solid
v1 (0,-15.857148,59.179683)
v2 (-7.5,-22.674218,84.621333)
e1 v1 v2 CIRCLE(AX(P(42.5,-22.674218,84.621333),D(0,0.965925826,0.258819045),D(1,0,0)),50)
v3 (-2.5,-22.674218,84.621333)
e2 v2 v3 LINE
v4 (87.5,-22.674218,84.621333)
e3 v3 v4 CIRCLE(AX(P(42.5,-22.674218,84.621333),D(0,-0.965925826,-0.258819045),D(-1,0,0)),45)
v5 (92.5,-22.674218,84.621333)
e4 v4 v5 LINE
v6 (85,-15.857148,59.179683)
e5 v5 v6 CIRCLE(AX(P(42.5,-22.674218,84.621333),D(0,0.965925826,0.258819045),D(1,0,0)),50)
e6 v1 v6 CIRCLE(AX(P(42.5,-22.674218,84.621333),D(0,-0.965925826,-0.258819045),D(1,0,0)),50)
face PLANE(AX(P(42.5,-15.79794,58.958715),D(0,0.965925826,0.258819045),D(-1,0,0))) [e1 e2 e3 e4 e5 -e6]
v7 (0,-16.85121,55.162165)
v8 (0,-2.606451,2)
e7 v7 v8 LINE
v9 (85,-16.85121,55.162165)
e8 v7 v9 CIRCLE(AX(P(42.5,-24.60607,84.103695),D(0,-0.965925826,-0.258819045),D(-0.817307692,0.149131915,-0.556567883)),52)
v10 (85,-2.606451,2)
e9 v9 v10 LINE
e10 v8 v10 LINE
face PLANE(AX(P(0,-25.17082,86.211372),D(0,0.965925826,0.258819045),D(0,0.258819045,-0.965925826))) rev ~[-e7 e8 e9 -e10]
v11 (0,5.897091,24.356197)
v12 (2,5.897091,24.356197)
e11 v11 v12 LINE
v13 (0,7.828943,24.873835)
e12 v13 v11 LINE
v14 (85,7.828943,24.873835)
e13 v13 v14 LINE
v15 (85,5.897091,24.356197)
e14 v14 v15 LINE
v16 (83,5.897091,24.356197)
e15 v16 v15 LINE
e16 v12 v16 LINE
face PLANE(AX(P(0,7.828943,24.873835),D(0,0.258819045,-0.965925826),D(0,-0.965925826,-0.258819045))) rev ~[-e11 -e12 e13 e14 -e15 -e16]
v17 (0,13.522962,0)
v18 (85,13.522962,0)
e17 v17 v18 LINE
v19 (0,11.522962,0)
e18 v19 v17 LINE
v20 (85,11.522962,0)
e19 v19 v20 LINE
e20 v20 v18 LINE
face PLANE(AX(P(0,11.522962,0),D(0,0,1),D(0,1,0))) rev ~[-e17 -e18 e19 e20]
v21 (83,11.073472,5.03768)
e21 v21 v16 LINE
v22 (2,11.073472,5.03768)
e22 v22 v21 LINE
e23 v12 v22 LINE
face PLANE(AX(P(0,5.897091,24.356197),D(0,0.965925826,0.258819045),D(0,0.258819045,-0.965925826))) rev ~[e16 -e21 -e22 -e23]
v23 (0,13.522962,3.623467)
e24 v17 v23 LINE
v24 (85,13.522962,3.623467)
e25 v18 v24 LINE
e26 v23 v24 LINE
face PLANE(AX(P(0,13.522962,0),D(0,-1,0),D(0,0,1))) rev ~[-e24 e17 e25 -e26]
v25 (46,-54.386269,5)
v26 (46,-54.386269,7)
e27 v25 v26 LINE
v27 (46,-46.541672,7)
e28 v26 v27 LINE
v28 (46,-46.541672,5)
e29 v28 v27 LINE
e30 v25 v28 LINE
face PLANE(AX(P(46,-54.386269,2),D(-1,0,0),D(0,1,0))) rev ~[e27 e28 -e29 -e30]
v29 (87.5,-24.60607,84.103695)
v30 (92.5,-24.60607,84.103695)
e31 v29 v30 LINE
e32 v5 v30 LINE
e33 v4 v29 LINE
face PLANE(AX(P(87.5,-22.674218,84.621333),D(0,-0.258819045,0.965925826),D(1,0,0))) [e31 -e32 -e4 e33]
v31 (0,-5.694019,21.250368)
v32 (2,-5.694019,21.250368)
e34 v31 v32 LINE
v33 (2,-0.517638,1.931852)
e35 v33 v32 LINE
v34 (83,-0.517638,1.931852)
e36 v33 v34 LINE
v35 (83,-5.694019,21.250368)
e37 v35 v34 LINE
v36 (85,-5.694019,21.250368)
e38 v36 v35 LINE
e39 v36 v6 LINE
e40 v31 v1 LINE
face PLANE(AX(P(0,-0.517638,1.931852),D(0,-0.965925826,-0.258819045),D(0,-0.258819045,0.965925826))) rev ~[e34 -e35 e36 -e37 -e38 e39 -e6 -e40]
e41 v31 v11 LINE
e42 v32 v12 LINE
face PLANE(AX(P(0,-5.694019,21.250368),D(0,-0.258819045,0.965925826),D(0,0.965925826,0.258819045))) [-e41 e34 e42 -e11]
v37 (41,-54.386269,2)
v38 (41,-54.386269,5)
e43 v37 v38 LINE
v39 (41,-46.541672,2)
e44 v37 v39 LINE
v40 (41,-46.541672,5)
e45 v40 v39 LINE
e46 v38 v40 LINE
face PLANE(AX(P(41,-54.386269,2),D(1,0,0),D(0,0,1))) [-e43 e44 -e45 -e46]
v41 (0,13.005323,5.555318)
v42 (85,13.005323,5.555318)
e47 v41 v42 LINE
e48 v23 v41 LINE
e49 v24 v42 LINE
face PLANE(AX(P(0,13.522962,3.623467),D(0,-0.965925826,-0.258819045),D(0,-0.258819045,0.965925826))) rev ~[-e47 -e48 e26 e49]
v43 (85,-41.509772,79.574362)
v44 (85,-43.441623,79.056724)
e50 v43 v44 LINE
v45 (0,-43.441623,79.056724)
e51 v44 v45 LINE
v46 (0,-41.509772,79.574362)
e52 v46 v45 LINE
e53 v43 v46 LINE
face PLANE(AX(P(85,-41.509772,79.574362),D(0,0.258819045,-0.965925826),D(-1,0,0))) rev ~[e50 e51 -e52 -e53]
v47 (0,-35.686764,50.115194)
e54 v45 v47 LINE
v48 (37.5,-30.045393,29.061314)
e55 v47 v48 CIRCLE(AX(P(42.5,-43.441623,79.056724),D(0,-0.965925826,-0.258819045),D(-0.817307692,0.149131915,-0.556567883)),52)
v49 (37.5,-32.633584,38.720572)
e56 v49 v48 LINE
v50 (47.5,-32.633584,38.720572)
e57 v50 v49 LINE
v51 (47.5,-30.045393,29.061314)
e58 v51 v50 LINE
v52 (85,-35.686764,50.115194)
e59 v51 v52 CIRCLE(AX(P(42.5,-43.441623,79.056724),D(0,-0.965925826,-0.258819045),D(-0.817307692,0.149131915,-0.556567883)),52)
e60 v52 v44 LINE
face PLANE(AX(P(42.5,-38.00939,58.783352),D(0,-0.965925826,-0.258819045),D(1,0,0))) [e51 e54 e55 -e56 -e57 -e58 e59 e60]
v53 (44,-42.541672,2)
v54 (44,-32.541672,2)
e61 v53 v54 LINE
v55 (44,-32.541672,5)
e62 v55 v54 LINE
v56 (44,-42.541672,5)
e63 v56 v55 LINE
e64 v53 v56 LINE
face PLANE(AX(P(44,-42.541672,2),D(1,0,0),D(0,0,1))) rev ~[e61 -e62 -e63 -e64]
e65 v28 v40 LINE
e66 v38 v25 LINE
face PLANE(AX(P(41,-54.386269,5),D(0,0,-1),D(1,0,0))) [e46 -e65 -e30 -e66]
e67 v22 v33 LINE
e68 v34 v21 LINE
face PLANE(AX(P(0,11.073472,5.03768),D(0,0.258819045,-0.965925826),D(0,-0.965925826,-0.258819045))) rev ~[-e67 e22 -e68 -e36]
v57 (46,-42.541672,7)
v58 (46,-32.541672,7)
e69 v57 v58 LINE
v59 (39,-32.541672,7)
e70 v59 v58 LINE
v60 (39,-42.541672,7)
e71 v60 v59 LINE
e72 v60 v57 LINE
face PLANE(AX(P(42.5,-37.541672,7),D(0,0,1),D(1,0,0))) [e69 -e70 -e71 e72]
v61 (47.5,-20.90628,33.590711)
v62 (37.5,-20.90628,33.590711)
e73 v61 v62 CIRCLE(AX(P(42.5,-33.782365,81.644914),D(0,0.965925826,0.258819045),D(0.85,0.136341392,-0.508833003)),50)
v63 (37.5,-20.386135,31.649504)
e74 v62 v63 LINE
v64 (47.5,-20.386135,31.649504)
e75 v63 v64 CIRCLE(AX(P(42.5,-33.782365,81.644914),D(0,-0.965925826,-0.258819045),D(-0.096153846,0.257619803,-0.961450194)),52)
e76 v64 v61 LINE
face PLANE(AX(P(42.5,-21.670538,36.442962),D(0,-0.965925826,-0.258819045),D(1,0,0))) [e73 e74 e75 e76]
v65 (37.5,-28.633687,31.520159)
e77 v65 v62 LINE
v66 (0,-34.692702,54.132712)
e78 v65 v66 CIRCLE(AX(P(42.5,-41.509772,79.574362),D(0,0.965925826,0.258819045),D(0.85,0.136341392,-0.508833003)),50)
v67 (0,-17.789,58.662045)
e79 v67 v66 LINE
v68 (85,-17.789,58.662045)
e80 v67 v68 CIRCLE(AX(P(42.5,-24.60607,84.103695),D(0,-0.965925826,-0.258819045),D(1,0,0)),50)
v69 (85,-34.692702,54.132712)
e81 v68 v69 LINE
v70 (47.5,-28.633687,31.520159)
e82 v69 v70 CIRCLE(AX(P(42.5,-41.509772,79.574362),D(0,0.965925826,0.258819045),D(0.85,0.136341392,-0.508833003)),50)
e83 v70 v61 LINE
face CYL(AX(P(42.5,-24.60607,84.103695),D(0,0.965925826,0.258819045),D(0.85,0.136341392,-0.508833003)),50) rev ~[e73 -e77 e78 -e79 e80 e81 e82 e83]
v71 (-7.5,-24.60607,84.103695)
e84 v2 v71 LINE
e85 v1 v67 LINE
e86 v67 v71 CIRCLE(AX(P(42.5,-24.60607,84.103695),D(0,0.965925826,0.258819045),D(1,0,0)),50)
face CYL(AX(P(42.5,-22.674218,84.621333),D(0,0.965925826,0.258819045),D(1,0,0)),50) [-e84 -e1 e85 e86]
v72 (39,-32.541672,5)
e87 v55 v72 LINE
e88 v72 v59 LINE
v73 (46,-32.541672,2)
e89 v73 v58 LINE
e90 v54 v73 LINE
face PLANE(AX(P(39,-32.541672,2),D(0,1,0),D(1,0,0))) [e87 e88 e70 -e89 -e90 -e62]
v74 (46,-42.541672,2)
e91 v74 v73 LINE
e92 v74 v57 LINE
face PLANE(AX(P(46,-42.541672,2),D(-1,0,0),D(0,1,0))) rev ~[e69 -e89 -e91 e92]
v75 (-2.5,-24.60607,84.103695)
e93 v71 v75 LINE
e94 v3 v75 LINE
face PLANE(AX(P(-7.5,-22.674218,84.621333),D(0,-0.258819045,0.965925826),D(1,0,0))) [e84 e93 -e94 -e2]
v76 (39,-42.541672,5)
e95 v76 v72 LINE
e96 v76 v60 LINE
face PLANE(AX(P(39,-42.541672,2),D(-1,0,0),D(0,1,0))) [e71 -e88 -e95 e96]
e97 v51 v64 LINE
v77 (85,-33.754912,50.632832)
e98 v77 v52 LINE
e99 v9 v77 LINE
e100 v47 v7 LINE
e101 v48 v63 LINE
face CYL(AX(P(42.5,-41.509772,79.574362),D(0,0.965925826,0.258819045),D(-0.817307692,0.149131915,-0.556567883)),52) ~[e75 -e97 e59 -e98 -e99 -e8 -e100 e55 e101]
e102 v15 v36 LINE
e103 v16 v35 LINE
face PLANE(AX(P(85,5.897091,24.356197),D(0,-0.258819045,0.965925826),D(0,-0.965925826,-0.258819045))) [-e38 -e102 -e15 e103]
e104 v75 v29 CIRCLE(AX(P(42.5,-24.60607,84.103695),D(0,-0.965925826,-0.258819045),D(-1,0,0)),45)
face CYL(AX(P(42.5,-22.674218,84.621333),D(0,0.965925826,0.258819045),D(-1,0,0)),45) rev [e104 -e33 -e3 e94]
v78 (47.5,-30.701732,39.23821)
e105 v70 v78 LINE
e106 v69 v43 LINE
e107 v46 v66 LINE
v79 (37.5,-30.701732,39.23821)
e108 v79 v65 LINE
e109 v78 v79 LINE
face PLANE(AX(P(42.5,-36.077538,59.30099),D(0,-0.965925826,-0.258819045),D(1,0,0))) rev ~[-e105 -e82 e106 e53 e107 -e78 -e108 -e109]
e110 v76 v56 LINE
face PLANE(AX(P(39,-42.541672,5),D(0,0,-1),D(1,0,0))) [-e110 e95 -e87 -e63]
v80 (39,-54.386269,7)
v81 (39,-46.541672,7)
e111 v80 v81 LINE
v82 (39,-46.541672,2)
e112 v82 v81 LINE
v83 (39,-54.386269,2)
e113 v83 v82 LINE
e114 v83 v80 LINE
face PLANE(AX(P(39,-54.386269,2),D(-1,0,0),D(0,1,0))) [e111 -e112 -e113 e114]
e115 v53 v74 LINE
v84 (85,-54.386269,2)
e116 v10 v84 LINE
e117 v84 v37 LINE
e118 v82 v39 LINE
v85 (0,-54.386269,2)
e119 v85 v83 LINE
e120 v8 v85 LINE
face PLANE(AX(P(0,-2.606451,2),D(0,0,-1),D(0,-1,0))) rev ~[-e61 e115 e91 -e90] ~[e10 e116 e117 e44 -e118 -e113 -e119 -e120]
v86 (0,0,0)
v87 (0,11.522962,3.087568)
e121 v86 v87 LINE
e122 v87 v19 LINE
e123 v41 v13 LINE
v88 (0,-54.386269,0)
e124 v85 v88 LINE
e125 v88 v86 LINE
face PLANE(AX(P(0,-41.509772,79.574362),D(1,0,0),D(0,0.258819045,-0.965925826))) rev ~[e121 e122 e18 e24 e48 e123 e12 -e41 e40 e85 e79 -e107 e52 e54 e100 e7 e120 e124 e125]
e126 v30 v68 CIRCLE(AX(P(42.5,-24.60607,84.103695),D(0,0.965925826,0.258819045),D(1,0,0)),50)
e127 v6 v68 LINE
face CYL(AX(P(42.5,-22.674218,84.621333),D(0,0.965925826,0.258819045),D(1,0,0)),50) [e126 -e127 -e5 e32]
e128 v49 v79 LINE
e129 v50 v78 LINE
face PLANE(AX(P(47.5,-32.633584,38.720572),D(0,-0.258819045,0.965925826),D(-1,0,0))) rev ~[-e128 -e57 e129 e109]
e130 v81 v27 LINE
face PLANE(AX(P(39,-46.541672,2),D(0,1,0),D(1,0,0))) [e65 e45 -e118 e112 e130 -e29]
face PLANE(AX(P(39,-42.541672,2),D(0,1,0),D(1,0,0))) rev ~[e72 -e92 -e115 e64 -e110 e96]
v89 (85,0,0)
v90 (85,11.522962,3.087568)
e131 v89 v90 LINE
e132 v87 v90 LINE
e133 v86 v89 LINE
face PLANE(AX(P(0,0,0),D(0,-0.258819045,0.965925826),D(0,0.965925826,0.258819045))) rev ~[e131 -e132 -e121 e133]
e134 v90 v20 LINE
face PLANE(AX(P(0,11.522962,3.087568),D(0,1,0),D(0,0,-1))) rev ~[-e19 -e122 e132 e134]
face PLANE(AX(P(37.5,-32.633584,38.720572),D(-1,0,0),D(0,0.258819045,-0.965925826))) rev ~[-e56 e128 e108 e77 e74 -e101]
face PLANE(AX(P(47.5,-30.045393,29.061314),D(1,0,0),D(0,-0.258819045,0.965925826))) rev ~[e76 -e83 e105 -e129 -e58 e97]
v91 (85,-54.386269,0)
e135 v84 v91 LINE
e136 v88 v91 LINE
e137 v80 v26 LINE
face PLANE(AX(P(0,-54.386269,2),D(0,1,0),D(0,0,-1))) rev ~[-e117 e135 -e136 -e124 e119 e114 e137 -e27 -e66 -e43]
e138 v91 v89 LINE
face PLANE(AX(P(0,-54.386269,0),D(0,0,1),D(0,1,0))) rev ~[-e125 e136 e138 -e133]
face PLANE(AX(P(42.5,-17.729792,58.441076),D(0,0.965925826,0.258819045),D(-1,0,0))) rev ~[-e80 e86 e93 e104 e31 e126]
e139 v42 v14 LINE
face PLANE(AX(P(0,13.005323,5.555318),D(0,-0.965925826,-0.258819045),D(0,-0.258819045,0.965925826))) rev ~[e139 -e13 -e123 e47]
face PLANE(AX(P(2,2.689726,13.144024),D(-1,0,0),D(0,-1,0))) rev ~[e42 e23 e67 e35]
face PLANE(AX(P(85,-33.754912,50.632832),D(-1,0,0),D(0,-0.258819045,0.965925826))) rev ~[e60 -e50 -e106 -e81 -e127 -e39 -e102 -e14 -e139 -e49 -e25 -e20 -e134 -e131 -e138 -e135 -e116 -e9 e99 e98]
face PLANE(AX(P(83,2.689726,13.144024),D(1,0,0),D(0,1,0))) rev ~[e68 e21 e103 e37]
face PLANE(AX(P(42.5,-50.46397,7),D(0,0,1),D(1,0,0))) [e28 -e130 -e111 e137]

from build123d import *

# Parameters (mm, degrees)
F1_DEPTH  = 85
F3_DEPTH  = 2
F5_DEPTH  = 2
F7_DEPTH  = 25
F9_DEPTH  = 17.5
F11_DEPTH = 2
F13_DEPTH = 10
F15_DEPTH = 2
F16_W     = 7
F16_H     = 10
F17_DEPTH = 5
F18_W     = 5
F18_H     = 3
F19_DEPTH = 25
F20_W     = 7
F20_H     = 7.8445977569
F21_DEPTH = 5
F22_W     = 5
F22_H     = 3
F23_DEPTH = 8


with BuildPart() as f1:
    # F0 (on Right) → F1 (new body)
    with BuildSketch(Plane.YZ):
        Polygon((-54.3862693012, 2), (-54.3862693012, 0), (0, 0), (11.522961568, 3.0875682466), (11.522961568, 0), (13.522961568, 0), (13.522961568, 3.6234666314), (13.0053234778, 5.555318284), (7.8289425758, 24.8738348098), (5.8970909232, 24.3561967196), (11.0734718253, 5.0376801938), (-0.5176380902, 1.9318516526), (-23.2389682748, 86.7290103171), (-25.1708199274, 86.2113722269), (-2.6064507457, 2), align=None)
    extrude(amount=F1_DEPTH)

    # F2 (on face) → F3 (join)
    with BuildSketch(Plane.YZ.offset(85)):
        Polygon((11.0734718253, 5.0376801938), (5.8970909232, 24.3561967196), (-5.6940189923, 21.2503681784), (-0.5176380902, 1.9318516526), align=None)
    extrude(amount=-F3_DEPTH)

    # F4 (on face) → F5 (join)
    with BuildSketch(Plane(origin=(0, 0, 0), x_dir=(0, -1, 0), z_dir=(-1, 0, 0))):
        Polygon((5.6940189923, 21.2503681784), (-5.8970909232, 24.3561967196), (-11.0734718253, 5.0376801938), (0.5176380902, 1.9318516526), align=None)
    extrude(amount=-F5_DEPTH)

    # F6 (on face) → F7 (cut)
    with BuildSketch(Plane(origin=(0, -1.9318516526, -0.5176380902), x_dir=(1, 0, 0), z_dir=(0, -0.9659258263, -0.2588190451))):
        with BuildLine():
            ThreePointArc((0, 61.2673163635), (56.1930639376, 39.5179905915), (92.5, 87.6064507457))
            ThreePointArc((92.5, 87.6064507457), (28.8069360624, 135.6949108999), (0, 61.2673163635))
        make_face()
    extrude(amount=-F7_DEPTH, mode=Mode.SUBTRACT)

    # F8 (on face) → F9 (join)
    with BuildSketch(Plane(origin=(0, -1.9318516526, -0.5176380902), x_dir=(1, 0, 0), z_dir=(0, -0.9659258263, -0.2588190451))):
        with BuildLine():
            ThreePointArc((85, 61.2673163636), (42.5, 37.6064507457), (0, 61.2673163636))
            Line((0, 61.2673163636), (0, 57.6439742125))
            ThreePointArc((0, 57.6439742125), (42.5, 35.6064507457), (85, 57.6439742125))
            Line((85, 57.6439742125), (85, 61.2673163636))
        make_face()
    extrude(amount=F9_DEPTH)

    # F10 (on face) → F11 (join)
    with BuildSketch(Plane(origin=(0, -18.8355536126, -5.0469713795), x_dir=(1, 0, 0), z_dir=(0, -0.9659258263, -0.2588190451))):
        with BuildLine():
            Line((0, 61.2673163636), (0, 57.6439742125))
            ThreePointArc((0, 57.6439742125), (42.5, 35.6064507457), (85, 57.6439742125))
            Line((85, 57.6439742125), (85, 61.2673163636))
            Line((85, 61.2673163636), (85, 87.6064507457))
            Line((85, 87.6064507457), (0, 87.6064507457))
            Line((0, 87.6064507457), (0, 61.2673163636))
        make_face()
    extrude(amount=F11_DEPTH)

    # F12 (on face) → F13 (cut)
    with BuildSketch(Plane(origin=(0, -20.7674052652, -5.5646094697), x_dir=(1, 0, 0), z_dir=(0, -0.9659258263, -0.2588190451))):
        with BuildLine():
            Line((37.5, 45.8473935673), (37.5, 35.8473935673))
            ThreePointArc((37.5, 35.8473935673), (42.5, 35.6064507457), (47.5, 35.8473935673))
            Line((47.5, 35.8473935673), (47.5, 45.8473935673))
            Line((47.5, 45.8473935673), (37.5, 45.8473935673))
        make_face()
    extrude(amount=-F13_DEPTH, mode=Mode.SUBTRACT)

    # F14 (on face) → F15 (join)
    with BuildSketch(Plane(origin=(0, 0, 0), x_dir=(-1, 0, 0), z_dir=(0, 0.9659258263, 0.2588190451))):
        with BuildLine():
            ThreePointArc((-92.5, 87.6064507457), (-42.5, 37.6064507457), (7.5, 87.6064507457))
            Line((7.5, 87.6064507457), (2.5, 87.6064507457))
            ThreePointArc((2.5, 87.6064507457), (-42.5, 42.6064507457), (-87.5, 87.6064507457))
            Line((-87.5, 87.6064507457), (-92.5, 87.6064507457))
        make_face()
    extrude(amount=-F15_DEPTH)

    # F16 (on face) → F17 (join)
    with BuildSketch(Plane.XY.offset(2)):
        with Locations((42.5, -37.5416715443)):
            Rectangle(F16_W, F16_H)
    extrude(amount=F17_DEPTH)

    # F18 (on face) → F19 (cut)
    with BuildSketch(Plane.XZ.offset(42.5416715443)):
        with Locations((41.5, 3.5)):
            Rectangle(F18_W, F18_H)
    extrude(amount=-F19_DEPTH, mode=Mode.SUBTRACT)

    # F20 (on face) → F21 (join)
    with BuildSketch(Plane.XY.offset(2)):
        with Locations((42.5, -50.4639704227)):
            Rectangle(F20_W, F20_H)
    extrude(amount=F21_DEPTH)

    # F22 (on face) → F23 (cut)
    with BuildSketch(Plane.XZ.offset(54.3862693012)):
        with Locations((43.5, 3.5)):
            Rectangle(F22_W, F22_H)
    extrude(amount=-F23_DEPTH, mode=Mode.SUBTRACT)


solid = f1.part
